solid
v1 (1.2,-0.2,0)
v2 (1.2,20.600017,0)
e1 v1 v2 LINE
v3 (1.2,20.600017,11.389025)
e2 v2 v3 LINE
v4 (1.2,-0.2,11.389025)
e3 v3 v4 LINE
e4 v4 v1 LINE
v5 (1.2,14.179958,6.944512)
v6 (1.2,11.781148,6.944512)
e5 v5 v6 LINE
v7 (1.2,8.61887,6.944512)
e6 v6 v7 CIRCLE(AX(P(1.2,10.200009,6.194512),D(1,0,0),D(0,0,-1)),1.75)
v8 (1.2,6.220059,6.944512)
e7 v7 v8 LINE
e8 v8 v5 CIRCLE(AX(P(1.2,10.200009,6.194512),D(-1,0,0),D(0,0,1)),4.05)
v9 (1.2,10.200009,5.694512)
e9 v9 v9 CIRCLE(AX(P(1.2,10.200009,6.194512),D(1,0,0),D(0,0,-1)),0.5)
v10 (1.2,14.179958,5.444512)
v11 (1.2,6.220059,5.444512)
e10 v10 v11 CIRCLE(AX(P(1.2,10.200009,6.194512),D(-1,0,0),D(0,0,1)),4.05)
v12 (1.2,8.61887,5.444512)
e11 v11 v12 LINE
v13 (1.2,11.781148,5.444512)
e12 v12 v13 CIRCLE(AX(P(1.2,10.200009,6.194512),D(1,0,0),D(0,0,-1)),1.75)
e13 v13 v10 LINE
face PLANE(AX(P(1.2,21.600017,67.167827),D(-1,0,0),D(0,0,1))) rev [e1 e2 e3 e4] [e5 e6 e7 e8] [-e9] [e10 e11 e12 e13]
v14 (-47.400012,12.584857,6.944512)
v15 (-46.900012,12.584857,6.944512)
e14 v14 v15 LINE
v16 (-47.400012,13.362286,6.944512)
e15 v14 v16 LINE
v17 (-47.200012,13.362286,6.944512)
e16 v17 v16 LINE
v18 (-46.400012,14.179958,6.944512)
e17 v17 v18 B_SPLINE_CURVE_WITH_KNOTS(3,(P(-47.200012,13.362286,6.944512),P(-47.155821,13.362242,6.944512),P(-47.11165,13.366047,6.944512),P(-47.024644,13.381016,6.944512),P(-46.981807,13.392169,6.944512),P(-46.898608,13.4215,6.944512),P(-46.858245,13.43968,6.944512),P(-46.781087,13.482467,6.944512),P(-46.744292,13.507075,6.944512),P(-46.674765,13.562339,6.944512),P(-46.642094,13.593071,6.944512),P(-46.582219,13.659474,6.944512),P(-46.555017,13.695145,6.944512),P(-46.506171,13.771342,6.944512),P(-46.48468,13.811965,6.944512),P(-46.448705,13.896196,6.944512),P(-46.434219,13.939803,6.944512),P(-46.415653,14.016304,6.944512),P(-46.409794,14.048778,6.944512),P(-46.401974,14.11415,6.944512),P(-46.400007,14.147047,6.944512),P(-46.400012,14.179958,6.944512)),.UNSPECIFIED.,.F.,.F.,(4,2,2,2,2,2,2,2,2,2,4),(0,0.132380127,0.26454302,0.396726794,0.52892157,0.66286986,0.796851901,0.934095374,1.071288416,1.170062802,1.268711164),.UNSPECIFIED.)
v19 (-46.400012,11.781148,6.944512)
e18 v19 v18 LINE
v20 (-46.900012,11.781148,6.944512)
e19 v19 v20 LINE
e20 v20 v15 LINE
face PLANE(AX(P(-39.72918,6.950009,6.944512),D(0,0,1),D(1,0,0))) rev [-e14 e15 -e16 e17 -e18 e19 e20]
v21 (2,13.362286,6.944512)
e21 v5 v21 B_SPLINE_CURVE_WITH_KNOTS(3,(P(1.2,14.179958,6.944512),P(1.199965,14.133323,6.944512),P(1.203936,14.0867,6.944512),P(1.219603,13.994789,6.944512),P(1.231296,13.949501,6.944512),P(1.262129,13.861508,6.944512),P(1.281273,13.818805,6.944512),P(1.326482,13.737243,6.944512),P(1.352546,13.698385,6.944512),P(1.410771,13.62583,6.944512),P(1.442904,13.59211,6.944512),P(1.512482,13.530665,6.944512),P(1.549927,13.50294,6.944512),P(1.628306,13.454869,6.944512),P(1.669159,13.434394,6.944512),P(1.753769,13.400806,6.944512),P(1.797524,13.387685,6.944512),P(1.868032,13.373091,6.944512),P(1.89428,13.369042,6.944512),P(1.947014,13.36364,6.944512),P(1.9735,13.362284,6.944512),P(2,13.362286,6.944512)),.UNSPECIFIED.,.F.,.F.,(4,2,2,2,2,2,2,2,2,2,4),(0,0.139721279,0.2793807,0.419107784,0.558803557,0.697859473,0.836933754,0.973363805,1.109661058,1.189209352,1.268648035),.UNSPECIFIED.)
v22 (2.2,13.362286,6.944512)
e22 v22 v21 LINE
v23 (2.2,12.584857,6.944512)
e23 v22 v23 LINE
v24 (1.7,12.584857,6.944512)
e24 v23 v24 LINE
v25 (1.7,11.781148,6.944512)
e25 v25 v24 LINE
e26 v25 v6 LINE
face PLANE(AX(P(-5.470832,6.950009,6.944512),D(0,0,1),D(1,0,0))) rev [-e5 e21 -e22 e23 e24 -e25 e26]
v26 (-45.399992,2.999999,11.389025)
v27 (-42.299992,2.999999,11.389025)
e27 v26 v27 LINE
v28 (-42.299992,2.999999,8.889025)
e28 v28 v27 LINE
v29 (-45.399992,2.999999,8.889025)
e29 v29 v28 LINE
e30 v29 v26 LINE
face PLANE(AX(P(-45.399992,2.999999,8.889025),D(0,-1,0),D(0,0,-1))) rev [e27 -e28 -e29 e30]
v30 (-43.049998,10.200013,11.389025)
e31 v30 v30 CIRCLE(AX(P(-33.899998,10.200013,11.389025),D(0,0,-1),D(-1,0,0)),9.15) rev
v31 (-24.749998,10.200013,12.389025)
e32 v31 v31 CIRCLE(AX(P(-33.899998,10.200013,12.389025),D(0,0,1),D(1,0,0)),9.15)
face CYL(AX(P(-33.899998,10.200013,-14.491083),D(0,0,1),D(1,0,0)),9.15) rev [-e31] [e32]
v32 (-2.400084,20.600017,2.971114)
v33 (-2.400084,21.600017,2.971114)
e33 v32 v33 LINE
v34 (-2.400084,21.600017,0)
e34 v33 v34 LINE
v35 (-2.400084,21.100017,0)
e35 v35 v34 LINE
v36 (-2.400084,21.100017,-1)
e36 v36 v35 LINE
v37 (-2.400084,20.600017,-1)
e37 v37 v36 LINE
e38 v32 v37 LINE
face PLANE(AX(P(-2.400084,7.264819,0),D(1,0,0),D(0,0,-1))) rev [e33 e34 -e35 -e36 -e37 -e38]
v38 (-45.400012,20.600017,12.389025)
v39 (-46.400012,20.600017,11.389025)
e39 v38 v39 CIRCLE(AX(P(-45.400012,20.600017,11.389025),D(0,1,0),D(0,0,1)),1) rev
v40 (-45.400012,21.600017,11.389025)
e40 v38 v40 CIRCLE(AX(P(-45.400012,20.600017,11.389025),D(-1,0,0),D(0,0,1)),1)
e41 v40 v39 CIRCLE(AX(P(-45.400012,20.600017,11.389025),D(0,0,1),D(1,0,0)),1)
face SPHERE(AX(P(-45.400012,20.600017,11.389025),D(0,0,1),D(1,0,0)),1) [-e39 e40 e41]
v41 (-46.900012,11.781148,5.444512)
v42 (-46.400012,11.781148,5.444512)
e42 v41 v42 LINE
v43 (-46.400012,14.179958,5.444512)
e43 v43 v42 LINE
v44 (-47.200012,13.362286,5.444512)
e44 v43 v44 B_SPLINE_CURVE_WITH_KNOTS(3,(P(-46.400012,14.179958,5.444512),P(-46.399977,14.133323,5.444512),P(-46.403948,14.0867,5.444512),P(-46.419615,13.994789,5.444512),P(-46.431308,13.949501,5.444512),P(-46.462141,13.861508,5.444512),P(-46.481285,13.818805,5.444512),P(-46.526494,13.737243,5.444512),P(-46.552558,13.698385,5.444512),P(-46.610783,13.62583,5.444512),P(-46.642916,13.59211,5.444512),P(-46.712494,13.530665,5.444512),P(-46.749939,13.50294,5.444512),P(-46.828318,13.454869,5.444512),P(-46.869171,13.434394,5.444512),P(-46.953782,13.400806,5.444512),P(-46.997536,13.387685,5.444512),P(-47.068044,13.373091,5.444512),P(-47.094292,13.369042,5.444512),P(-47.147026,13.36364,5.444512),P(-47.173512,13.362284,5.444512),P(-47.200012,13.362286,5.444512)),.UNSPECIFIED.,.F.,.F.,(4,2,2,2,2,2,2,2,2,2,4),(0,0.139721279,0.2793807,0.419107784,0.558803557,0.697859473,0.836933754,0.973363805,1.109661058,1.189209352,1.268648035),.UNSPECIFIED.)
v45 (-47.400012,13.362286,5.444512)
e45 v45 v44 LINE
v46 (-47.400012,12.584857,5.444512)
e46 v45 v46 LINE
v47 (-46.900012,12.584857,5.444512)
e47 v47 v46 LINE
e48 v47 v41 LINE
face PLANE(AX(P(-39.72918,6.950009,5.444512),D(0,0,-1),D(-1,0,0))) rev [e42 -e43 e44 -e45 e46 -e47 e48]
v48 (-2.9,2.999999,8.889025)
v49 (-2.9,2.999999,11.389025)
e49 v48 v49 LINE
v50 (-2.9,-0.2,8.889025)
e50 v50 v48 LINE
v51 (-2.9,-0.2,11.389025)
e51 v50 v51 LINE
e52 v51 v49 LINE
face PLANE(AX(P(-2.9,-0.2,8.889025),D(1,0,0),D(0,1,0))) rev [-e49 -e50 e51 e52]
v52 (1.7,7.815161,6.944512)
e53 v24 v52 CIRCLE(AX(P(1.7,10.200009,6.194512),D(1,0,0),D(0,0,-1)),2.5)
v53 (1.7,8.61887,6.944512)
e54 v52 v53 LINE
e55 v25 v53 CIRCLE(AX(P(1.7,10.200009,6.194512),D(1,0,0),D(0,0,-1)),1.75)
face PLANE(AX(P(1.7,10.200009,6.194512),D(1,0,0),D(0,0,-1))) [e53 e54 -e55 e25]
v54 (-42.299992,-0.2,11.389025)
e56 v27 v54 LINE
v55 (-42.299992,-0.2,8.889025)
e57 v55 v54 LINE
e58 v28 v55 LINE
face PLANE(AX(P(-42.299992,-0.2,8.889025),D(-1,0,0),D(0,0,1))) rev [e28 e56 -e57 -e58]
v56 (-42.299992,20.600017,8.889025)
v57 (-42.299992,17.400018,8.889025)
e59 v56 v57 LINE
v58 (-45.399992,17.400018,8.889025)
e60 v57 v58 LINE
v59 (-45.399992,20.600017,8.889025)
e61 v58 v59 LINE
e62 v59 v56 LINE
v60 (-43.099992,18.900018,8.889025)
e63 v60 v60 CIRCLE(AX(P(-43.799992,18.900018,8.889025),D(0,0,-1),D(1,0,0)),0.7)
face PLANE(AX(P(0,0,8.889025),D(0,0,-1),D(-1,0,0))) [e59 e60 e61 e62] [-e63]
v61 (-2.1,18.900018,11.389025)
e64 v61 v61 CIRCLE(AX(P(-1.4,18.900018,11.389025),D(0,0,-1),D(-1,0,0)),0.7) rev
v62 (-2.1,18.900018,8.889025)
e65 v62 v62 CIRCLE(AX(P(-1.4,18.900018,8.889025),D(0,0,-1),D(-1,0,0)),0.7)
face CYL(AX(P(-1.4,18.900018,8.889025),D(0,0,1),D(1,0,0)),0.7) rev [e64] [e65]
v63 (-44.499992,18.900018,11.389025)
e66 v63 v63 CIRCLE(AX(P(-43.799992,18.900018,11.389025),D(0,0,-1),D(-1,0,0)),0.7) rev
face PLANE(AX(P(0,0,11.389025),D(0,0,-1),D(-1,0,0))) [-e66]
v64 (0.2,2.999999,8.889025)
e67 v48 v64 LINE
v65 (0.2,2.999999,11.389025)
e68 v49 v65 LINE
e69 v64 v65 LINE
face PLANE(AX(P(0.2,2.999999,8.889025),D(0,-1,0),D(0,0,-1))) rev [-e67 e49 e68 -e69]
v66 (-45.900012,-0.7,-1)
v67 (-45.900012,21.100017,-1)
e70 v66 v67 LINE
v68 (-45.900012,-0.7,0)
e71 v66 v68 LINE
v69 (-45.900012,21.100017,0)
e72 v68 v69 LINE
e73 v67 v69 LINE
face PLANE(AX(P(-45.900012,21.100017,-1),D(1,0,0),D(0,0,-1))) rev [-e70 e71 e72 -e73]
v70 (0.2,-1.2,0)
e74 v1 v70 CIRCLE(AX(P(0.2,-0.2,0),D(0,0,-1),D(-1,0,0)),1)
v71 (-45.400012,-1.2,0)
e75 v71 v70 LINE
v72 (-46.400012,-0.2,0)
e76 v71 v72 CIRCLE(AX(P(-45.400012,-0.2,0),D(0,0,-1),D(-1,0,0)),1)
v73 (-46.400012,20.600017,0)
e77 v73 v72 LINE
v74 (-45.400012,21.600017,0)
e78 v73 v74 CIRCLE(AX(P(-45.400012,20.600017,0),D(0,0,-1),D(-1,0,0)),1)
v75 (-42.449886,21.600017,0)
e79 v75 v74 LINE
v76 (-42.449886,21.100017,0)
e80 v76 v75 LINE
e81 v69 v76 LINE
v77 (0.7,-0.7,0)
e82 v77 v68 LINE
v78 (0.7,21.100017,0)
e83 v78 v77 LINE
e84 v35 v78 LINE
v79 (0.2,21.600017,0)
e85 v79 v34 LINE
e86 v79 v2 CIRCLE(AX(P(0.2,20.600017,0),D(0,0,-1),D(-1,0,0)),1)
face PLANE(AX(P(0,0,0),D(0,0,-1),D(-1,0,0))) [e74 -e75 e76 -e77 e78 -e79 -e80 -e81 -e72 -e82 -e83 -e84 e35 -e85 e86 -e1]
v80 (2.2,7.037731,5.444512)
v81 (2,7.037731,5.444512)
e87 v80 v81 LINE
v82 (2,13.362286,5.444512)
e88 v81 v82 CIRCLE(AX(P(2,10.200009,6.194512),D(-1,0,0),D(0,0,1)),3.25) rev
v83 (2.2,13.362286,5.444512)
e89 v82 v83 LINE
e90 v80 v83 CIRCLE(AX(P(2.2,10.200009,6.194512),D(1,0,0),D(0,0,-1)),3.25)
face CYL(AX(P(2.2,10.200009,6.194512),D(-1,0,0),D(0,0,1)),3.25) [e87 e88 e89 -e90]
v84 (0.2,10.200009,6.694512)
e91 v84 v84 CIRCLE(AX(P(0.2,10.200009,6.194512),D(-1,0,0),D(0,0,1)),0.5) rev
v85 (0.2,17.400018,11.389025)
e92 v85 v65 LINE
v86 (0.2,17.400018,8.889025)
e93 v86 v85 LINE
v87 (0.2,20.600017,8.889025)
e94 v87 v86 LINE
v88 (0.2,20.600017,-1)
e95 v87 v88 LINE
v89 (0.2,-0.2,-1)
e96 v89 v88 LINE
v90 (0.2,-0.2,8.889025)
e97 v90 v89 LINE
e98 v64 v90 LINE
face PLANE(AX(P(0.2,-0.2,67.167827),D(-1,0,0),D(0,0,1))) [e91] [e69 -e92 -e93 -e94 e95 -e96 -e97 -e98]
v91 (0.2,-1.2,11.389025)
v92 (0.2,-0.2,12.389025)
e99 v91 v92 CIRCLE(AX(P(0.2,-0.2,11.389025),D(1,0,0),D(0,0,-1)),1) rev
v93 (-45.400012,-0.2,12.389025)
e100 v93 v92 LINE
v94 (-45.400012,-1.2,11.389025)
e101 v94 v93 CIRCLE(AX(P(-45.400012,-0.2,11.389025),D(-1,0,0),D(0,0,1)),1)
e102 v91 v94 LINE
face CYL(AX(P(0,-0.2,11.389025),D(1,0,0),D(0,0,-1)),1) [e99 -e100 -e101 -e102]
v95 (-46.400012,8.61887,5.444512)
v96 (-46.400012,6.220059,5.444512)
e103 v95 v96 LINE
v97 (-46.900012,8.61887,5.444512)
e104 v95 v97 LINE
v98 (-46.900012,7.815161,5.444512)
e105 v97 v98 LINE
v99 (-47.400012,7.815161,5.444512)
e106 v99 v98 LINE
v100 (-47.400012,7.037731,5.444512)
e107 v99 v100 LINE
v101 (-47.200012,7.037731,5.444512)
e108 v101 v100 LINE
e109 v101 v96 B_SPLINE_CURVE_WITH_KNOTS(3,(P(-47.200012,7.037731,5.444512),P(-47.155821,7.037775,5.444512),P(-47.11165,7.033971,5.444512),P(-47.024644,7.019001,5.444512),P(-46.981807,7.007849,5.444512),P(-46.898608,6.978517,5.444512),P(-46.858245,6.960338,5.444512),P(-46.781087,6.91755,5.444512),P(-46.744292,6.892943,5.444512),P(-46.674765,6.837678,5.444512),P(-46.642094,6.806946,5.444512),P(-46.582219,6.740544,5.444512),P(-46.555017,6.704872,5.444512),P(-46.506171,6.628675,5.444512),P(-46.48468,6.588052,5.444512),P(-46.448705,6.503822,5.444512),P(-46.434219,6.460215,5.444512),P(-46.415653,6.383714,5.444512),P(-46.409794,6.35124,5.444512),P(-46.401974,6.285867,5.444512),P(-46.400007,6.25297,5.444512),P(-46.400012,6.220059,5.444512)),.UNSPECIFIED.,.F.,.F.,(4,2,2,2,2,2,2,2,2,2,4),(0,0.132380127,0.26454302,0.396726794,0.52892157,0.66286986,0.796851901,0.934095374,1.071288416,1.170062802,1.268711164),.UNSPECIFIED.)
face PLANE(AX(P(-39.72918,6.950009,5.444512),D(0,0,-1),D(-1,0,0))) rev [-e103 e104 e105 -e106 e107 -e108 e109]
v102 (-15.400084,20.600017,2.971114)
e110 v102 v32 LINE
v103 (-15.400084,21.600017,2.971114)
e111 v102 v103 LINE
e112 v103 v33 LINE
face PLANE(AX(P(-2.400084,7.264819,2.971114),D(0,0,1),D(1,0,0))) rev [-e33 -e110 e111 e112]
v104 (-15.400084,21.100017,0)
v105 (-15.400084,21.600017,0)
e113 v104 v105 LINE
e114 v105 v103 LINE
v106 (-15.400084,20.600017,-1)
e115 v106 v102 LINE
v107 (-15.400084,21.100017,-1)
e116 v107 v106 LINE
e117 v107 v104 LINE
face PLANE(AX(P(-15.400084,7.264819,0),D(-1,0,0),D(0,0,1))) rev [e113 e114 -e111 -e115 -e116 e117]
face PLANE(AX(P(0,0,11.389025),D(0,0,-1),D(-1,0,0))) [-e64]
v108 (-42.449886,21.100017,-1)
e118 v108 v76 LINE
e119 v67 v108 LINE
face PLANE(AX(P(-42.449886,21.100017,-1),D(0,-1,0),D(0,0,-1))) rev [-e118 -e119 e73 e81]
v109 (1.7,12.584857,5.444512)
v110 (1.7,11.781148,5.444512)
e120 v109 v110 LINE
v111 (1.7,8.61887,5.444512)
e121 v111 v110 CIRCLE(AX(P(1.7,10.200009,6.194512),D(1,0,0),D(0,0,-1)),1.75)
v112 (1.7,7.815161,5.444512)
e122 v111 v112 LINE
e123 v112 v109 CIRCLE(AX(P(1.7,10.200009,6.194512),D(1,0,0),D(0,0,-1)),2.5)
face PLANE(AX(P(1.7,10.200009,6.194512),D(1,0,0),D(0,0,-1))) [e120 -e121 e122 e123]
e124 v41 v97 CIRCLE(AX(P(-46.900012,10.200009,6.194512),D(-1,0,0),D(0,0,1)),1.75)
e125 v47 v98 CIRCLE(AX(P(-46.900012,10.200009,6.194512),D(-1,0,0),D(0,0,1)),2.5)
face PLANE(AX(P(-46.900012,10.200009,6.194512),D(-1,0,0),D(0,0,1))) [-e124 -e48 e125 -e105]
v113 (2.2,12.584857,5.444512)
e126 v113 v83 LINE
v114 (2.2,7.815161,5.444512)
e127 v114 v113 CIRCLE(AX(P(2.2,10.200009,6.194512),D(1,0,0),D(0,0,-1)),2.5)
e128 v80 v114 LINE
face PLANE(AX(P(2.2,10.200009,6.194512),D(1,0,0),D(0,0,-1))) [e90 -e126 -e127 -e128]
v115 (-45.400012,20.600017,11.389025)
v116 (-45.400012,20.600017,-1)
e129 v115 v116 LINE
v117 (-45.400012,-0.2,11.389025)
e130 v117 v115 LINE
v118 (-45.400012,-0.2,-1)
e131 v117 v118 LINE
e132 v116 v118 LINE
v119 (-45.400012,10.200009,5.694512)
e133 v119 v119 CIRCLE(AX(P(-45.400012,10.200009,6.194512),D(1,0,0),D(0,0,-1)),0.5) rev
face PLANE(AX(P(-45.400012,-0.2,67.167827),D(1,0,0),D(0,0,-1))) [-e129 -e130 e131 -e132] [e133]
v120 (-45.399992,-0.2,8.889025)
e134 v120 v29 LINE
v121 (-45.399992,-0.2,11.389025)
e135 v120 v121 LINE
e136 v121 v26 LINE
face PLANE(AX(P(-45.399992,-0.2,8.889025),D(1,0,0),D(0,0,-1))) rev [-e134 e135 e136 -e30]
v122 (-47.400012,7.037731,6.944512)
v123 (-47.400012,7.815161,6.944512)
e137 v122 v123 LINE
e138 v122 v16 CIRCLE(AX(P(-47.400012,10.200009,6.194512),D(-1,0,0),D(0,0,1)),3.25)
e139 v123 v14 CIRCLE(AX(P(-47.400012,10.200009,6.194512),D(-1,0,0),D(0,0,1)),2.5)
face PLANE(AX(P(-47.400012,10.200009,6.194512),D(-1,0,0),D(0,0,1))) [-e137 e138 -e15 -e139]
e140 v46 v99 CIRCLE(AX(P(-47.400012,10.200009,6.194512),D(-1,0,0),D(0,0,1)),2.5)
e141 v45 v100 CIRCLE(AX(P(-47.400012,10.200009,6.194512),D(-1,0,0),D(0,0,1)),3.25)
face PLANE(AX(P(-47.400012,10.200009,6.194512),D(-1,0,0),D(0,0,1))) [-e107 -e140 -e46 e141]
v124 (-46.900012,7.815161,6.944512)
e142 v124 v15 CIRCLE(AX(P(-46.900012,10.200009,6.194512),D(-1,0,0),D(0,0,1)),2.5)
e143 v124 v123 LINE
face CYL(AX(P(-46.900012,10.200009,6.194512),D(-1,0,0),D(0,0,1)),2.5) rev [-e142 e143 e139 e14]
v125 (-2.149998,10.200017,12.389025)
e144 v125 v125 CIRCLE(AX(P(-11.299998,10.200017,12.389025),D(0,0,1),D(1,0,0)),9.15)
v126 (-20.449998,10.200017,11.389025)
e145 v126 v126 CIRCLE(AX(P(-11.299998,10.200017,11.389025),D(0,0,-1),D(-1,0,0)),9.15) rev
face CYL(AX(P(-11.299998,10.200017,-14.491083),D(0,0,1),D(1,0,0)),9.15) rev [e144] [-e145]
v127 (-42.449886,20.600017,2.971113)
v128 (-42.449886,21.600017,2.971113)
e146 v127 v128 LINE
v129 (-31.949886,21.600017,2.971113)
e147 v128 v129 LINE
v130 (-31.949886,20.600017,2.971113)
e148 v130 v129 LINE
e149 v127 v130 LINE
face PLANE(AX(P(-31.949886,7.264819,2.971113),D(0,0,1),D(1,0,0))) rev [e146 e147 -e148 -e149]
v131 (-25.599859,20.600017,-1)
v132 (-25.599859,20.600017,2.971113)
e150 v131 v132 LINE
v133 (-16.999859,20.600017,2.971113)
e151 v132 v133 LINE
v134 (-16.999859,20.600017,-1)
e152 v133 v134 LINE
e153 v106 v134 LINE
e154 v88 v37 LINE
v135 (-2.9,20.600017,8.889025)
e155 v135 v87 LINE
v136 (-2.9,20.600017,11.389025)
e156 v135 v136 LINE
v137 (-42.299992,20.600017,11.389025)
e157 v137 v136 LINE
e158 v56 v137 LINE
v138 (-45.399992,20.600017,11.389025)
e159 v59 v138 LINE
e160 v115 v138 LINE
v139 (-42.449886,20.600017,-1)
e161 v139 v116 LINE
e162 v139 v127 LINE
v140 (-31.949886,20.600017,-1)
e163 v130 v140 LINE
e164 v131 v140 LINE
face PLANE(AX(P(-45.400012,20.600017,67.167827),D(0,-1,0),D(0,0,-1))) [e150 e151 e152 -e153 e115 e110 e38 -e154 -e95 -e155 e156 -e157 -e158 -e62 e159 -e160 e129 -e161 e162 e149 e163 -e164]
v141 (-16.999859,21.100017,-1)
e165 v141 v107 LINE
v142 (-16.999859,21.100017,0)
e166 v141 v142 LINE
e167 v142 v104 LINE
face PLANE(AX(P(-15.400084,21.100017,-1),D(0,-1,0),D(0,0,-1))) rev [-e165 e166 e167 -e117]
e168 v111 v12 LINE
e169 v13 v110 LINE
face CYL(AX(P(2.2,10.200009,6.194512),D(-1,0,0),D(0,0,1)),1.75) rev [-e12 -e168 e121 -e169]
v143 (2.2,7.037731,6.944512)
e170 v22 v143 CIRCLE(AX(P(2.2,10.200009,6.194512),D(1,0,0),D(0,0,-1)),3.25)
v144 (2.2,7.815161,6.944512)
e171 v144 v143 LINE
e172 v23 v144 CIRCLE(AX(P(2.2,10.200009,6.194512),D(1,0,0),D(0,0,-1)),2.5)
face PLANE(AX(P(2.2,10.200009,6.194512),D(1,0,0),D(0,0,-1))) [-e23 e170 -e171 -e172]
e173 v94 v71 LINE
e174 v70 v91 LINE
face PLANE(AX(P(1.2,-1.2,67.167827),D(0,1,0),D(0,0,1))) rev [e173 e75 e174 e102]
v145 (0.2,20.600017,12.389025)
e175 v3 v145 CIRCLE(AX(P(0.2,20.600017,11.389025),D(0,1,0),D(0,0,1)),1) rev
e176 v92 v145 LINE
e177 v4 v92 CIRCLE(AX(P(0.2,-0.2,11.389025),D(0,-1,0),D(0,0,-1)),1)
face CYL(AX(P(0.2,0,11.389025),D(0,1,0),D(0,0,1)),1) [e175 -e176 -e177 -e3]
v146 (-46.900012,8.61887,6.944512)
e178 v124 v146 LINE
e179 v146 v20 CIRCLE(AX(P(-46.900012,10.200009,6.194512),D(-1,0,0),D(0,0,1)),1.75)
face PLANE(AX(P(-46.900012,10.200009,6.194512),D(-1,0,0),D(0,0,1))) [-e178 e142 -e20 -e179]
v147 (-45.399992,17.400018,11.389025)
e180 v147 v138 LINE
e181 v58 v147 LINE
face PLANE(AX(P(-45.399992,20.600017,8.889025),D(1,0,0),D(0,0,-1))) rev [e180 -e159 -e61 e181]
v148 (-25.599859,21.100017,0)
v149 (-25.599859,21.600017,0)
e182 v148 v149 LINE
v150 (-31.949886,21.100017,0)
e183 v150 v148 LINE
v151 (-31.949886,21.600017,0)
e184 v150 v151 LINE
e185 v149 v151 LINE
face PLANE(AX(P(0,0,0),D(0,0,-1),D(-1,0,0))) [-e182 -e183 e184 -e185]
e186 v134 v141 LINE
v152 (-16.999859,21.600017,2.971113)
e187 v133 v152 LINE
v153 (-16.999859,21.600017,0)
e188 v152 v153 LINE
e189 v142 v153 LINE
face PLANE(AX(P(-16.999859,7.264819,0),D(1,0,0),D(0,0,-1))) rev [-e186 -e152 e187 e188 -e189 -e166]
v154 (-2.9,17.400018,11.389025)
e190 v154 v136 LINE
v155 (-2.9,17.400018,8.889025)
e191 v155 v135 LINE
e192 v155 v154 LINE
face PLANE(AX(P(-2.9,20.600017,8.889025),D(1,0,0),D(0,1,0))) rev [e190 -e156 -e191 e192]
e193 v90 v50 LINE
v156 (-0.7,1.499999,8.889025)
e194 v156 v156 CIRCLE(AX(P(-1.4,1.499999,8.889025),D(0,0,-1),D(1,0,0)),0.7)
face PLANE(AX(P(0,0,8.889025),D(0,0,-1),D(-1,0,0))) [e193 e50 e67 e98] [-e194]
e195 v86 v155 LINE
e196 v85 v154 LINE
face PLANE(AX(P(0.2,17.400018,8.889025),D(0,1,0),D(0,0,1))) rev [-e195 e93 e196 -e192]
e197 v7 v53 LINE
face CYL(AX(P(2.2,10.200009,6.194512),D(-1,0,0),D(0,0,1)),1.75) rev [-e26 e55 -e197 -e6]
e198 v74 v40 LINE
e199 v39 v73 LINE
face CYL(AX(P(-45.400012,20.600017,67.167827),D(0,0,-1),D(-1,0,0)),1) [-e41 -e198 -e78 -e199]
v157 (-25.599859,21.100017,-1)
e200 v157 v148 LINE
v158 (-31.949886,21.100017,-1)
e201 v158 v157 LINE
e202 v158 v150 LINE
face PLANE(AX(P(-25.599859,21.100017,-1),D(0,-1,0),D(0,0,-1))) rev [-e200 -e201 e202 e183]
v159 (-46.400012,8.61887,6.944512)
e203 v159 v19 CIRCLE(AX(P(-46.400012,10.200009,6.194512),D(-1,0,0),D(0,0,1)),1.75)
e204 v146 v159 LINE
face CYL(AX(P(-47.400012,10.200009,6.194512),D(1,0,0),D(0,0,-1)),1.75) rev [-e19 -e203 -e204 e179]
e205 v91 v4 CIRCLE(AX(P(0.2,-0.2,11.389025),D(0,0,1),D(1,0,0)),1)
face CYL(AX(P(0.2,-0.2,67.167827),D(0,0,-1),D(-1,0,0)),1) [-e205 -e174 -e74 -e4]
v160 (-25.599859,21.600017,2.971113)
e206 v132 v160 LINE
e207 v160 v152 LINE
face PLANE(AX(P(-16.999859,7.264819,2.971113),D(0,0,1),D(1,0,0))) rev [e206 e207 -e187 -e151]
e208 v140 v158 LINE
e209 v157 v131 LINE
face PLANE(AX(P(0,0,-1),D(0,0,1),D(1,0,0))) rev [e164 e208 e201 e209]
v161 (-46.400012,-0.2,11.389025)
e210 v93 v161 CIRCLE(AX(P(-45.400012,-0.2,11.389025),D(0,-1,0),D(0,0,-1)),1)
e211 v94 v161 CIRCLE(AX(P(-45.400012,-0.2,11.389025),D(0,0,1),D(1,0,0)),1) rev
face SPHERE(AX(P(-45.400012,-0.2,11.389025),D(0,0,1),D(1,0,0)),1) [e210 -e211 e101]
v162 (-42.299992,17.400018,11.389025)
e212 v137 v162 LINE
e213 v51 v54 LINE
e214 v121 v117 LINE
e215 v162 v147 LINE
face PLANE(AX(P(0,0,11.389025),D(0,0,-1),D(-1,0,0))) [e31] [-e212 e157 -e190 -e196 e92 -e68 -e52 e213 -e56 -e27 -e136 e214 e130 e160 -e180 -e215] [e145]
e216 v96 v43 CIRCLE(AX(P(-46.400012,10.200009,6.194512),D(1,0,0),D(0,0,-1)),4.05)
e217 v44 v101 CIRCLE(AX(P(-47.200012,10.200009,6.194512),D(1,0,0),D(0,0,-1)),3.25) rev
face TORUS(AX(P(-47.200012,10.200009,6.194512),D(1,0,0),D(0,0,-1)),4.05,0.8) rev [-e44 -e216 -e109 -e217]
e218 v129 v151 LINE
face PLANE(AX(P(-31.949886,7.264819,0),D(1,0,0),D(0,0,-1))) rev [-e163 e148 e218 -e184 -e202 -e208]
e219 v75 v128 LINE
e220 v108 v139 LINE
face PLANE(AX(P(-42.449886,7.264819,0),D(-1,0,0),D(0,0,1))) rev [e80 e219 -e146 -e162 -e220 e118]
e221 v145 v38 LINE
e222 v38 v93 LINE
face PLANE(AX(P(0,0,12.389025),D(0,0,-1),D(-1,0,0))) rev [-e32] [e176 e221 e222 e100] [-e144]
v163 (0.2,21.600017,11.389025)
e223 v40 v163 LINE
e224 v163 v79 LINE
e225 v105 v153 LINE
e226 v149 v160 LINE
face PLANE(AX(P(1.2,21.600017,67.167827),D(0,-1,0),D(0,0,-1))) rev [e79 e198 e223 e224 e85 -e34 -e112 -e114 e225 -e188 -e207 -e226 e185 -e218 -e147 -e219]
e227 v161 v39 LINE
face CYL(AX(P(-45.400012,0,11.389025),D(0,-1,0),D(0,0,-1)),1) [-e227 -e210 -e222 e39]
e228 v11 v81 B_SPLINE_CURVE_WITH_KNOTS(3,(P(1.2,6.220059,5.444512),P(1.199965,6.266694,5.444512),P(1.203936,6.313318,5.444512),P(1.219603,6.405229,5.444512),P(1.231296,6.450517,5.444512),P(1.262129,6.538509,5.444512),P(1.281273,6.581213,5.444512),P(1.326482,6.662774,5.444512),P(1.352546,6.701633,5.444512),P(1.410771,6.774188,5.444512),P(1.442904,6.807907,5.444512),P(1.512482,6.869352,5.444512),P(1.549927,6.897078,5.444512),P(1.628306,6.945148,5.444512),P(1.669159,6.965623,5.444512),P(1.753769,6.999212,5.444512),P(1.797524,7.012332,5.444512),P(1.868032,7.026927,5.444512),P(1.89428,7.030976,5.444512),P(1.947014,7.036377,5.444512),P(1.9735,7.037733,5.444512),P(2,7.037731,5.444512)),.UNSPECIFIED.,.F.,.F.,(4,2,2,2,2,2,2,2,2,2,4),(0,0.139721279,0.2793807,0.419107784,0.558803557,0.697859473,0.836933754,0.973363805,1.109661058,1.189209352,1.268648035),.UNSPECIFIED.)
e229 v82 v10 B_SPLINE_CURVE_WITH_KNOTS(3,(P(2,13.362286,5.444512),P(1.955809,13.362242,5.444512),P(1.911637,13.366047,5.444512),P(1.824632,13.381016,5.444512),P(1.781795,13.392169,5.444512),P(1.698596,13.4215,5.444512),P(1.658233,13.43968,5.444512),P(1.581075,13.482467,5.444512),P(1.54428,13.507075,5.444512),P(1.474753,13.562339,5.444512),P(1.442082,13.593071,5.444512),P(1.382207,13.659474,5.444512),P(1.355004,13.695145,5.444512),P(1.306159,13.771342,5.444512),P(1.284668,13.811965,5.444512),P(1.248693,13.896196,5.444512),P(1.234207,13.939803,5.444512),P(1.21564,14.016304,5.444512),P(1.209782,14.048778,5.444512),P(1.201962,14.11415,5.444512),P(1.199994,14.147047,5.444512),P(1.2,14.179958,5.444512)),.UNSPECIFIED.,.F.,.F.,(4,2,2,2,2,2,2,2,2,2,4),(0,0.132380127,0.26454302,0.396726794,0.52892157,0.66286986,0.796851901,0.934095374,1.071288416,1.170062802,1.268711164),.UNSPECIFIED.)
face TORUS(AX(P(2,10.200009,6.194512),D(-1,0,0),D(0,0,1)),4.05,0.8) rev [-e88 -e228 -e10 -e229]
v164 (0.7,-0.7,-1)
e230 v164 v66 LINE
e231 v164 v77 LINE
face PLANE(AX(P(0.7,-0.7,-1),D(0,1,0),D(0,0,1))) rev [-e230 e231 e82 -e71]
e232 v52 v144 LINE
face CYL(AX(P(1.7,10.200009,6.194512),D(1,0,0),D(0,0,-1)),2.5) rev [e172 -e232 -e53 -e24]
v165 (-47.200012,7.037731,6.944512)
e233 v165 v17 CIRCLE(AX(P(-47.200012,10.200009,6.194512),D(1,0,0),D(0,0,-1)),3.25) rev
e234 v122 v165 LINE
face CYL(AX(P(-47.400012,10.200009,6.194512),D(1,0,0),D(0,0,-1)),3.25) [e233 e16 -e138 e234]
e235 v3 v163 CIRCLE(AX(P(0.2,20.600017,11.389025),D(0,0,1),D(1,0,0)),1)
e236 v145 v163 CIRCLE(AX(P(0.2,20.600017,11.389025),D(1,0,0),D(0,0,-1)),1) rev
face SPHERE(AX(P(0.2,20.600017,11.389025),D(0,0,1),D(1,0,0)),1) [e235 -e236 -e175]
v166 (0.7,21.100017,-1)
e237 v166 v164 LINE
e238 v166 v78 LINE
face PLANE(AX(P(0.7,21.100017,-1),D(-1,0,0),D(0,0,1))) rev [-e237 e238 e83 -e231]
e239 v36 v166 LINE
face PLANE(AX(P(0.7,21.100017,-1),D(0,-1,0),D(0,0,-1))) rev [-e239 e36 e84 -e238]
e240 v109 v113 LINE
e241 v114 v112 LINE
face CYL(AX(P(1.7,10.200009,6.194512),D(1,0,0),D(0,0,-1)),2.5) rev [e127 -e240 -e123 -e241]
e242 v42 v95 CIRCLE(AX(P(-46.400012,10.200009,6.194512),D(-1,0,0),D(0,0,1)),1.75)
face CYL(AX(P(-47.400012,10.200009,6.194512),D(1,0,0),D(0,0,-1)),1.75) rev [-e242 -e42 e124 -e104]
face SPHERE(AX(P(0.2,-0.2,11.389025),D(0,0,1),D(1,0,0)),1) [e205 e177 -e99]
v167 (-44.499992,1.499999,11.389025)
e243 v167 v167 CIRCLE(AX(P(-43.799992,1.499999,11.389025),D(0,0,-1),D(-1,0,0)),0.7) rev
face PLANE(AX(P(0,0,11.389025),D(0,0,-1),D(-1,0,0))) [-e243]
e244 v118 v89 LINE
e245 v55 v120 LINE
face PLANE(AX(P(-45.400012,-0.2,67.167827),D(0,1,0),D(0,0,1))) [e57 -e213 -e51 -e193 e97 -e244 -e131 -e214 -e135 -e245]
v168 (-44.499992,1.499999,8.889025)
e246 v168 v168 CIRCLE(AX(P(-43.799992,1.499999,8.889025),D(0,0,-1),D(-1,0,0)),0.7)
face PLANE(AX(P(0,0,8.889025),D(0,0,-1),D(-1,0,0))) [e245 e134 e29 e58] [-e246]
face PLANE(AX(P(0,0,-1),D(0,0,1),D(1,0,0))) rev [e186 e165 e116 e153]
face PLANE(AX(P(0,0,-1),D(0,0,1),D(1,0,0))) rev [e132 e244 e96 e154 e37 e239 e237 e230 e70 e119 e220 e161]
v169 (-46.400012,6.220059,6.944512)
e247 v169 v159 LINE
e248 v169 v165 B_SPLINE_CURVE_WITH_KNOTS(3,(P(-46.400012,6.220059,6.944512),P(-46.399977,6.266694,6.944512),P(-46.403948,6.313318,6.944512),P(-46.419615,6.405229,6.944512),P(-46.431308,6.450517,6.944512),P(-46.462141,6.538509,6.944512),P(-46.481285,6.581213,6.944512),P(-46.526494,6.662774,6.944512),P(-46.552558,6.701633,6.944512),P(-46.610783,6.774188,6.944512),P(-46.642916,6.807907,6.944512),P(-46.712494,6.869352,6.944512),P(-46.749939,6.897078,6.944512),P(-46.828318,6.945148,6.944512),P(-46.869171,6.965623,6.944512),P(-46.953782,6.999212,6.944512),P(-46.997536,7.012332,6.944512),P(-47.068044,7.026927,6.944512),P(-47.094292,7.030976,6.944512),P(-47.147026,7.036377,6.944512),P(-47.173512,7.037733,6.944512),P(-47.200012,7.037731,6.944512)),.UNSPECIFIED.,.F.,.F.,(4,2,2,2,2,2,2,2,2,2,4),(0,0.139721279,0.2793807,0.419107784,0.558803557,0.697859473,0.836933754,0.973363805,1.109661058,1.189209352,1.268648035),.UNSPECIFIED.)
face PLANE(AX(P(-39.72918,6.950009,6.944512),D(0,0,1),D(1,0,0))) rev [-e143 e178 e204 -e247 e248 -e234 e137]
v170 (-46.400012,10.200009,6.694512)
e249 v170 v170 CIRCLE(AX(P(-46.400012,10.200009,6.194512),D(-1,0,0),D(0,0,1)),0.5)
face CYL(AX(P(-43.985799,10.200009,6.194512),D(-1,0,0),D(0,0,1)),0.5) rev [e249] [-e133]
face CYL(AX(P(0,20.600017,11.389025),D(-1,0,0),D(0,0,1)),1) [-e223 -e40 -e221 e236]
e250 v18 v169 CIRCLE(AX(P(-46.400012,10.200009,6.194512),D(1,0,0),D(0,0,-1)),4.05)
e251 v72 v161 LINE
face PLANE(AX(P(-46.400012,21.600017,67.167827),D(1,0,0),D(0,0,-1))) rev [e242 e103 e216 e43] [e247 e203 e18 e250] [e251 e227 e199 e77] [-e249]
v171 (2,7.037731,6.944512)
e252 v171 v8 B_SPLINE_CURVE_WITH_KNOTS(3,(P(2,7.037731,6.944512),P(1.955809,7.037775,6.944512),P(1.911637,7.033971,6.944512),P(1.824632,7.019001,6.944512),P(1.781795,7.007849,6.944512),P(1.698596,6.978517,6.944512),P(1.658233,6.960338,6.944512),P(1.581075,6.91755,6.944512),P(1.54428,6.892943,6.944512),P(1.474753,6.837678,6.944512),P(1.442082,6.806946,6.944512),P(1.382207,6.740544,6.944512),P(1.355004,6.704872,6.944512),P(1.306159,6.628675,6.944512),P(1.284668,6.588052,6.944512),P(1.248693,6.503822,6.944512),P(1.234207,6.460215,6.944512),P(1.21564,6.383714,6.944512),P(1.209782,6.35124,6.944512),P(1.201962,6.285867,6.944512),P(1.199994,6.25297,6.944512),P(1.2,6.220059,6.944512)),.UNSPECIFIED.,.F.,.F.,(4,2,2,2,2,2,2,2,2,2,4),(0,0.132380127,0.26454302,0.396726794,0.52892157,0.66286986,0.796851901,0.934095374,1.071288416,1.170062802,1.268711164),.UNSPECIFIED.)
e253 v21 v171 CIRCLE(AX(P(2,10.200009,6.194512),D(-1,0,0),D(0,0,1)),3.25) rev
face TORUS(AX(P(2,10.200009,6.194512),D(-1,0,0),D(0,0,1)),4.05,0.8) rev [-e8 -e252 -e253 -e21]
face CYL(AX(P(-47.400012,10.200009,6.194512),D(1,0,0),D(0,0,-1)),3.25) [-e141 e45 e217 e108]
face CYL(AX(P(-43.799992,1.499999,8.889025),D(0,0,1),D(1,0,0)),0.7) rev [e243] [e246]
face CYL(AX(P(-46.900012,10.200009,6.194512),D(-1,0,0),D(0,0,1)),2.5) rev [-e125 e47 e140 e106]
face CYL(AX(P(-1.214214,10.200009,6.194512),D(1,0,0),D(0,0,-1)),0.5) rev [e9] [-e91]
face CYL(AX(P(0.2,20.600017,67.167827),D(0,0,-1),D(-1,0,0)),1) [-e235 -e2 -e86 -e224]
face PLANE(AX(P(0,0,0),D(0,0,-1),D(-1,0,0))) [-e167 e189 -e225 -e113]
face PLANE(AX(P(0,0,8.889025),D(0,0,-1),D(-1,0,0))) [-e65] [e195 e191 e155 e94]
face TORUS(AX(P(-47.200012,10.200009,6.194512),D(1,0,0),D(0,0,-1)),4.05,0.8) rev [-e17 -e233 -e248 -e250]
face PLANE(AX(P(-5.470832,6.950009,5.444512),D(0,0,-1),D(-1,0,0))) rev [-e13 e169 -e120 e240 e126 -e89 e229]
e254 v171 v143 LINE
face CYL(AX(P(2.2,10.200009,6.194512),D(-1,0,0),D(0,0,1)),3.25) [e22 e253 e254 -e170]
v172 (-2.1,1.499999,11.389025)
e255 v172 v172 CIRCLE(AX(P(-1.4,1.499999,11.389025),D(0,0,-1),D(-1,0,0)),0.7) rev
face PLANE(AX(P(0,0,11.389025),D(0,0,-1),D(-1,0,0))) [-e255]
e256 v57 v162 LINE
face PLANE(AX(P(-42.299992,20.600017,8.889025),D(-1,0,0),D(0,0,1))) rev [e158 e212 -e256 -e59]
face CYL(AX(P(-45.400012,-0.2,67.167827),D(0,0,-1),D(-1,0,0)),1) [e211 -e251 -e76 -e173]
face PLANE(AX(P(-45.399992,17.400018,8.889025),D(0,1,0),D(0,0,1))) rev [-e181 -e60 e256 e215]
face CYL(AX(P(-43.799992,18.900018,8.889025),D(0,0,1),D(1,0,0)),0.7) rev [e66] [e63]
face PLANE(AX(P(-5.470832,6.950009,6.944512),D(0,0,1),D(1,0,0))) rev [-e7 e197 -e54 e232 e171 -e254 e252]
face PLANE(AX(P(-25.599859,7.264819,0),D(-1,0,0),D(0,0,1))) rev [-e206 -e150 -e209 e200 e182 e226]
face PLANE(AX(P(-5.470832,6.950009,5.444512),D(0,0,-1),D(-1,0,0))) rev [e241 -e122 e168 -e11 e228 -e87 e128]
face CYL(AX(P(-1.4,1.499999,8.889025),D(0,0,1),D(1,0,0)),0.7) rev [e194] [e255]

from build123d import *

# Parameters (mm, degrees)
SKETCH_1_W           = 47.600012207
SKETCH_1_H           = 22.800017408
SKETCH_1_W_2         = 45.600012207
SKETCH_1_H_2         = 20.800017408
EXTRUDE_1_DEPTH      = 11.389024732
SKETCH_2_W           = 47.600012207
SKETCH_2_H           = 22.800017408
EXTRUDE_2_DEPTH      = 1
SKETCH_3_R           = 9.15
CUT_EXTRUDE_1_DEPTH  = 1
SKETCH_7_W           = 13
SKETCH_7_H           = 2.971113622
SKETCH_7_W_2         = 8.6
SKETCH_7_H_2         = 2.971113154
SKETCH_7_W_3         = 10.5
SKETCH_7_H_3         = 2.971112957
CUT_EXTRUDE_2_DEPTH  = 1
SKETCH_8_R           = 3.25
SKETCH_8_R_2         = 1.75
EXTRUDE_3_DEPTH      = 1
SKETCH_9_W           = 1.5
SKETCH_9_H           = 6.5
CUT_EXTRUDE_3_DEPTH  = 1
SKETCH_10_R          = 2.5
CUT_EXTRUDE_6_DEPTH  = 0.5
SKETCH_13_R          = 0.5
CUT_EXTRUDE_7_DEPTH  = 1
EXTRUDE_START        = 1
SKETCH_15_R          = 3.25
SKETCH_15_R_2        = 1.75
EXTRUDE_4_DEPTH      = 1
CUT_EXTRUDE_START    = -0.5
SKETCH_16_R          = 2.5
CUT_EXTRUDE_8_DEPTH  = 0.5
SKETCH_17_W          = 1.5
SKETCH_17_H          = 6.5
CUT_EXTRUDE_9_DEPTH  = 1
CUT_EXTRUDE_START_2  = -1
SKETCH_18_R          = 0.5
CUT_EXTRUDE_10_DEPTH = 1
SKETCH_19_W          = 1.599774972
SKETCH_19_H          = 0.5
SKETCH_19_W_2        = 6.350027001
EXTRUDE_5_DEPTH      = 1
FILLET_1_R           = 0.8
FILLET_2_R           = 1
SKETCH_20_W          = 3.099999541
SKETCH_20_H          = 3.199999216
SKETCH_20_R          = 0.7
EXTRUDE_6_DEPTH      = 2.5


with BuildPart() as part:
    # Эскиз1 → Бобышка-Вытянуть1 (new body)
    with BuildSketch(Plane.XY):
        with Locations((-22.600006104, 10.200008704)):
            Rectangle(SKETCH_1_W, SKETCH_1_H)
        with Locations((-22.600006104, 10.200008704)):
            Rectangle(SKETCH_1_W_2, SKETCH_1_H_2, mode=Mode.SUBTRACT)
    extrude(amount=EXTRUDE_1_DEPTH)

    # Эскиз2 → Бобышка-Вытянуть2 (add)
    with BuildSketch(Plane.XY.offset(11.389024732)):
        with Locations((-22.600006104, 10.200008704)):
            Rectangle(SKETCH_2_W, SKETCH_2_H)
    extrude(amount=EXTRUDE_2_DEPTH)

    # Эскиз3 → Вырез-Вытянуть1 (cut)
    with BuildSketch(Plane.XY.offset(12.389024732)):
        with Locations((-11.299998193, 10.200016658)):
            Circle(SKETCH_3_R)
        with Locations((-33.899998193, 10.200013156)):
            Circle(SKETCH_3_R)
    extrude(amount=-CUT_EXTRUDE_1_DEPTH, mode=Mode.SUBTRACT)

    # Эскиз7 → Вырез-Вытянуть2 (cut)
    with BuildSketch(Plane(origin=(0, 21.600017408, 0), x_dir=(1, 0, 0), z_dir=(0, 1, 0))):
        with Locations((-8.900084477, -1.485556811)):
            Rectangle(SKETCH_7_W, SKETCH_7_H)
        with Locations((-21.299859449, -1.485556577)):
            Rectangle(SKETCH_7_W_2, SKETCH_7_H_2)
        with Locations((-37.19988645, -1.485556479)):
            Rectangle(SKETCH_7_W_3, SKETCH_7_H_3)
    extrude(amount=-CUT_EXTRUDE_2_DEPTH, mode=Mode.SUBTRACT)

    # Эскиз8 → Бобышка-Вытянуть3 (add)
    with BuildSketch(Plane(origin=(1.2, 0, 0), x_dir=(0, 0, -1), z_dir=(1, 0, 0))):
        with Locations((-6.194512366, 10.200008704)):
            Circle(SKETCH_8_R)
        with Locations((-6.194512366, 10.200008704)):
            Circle(SKETCH_8_R_2, mode=Mode.SUBTRACT)
    extrude(amount=EXTRUDE_3_DEPTH)

    # Эскиз9 → Вырез-Вытянуть3 (cut)
    with BuildSketch(Plane(origin=(2.2, 0, 0), x_dir=(0, 0, -1), z_dir=(1, 0, 0))):
        with Locations((-6.194512366, 10.200008704)):
            Rectangle(SKETCH_9_W, SKETCH_9_H)
    extrude(amount=-CUT_EXTRUDE_3_DEPTH, mode=Mode.SUBTRACT)

    # Эскиз10 → Вырез-Вытянуть6 (cut)
    with BuildSketch(Plane(origin=(2.2, 0, 0), x_dir=(0, 0, -1), z_dir=(1, 0, 0))):
        with Locations((-6.194512366, 10.200008704)):
            Circle(SKETCH_10_R)
    extrude(amount=-CUT_EXTRUDE_6_DEPTH, mode=Mode.SUBTRACT)

    # Эскиз13 → Вырез-Вытянуть7 (cut)
    with BuildSketch(Plane(origin=(1.2, 0, 0), x_dir=(0, 0, -1), z_dir=(1, 0, 0))):
        with Locations((-6.194512366, 10.200008704)):
            Circle(SKETCH_13_R)
    extrude(amount=-CUT_EXTRUDE_7_DEPTH, mode=Mode.SUBTRACT)

    # Эскиз15 → Бобышка-Вытянуть4 (add)
    with BuildSketch(Plane.ZY.offset(46.400012207).offset(EXTRUDE_START)):
        with Locations((6.194512366, 10.200008704)):
            Circle(SKETCH_15_R)
        with Locations((6.194512366, 10.200008704)):
            Circle(SKETCH_15_R_2, mode=Mode.SUBTRACT)
    extrude(amount=-EXTRUDE_4_DEPTH)

    # Эскиз16 → Вырез-Вытянуть8 (cut)
    with BuildSketch(Plane.ZY.offset(47.400012207).offset(CUT_EXTRUDE_START)):
        with Locations((6.194512366, 10.200008704)):
            Circle(SKETCH_16_R)
    extrude(amount=CUT_EXTRUDE_8_DEPTH, mode=Mode.SUBTRACT)

    # Эскиз17 → Вырез-Вытянуть9 (cut)
    with BuildSketch(Plane.ZY.offset(47.400012207)):
        with Locations((6.194512366, 10.200008704)):
            Rectangle(SKETCH_17_W, SKETCH_17_H)
    extrude(amount=-CUT_EXTRUDE_9_DEPTH, mode=Mode.SUBTRACT)

    # Эскиз18 → Вырез-Вытянуть10 (cut)
    with BuildSketch(Plane.ZY.offset(46.400012207).offset(CUT_EXTRUDE_START_2)):
        with Locations(Location((6.194512366, 10.200008704, 0), (0, 0, 180))):
            Circle(SKETCH_18_R)
    extrude(amount=CUT_EXTRUDE_10_DEPTH, mode=Mode.SUBTRACT)

    # Эскиз19 → Бобышка-Вытянуть5 (add)
    with BuildSketch(Plane(origin=(0, 0, 0), x_dir=(-1, 0, 0), z_dir=(0, 0, -1))):
        with Locations((16.199971963, 20.850017408)):
            Rectangle(SKETCH_19_W, SKETCH_19_H)
        Polygon((45.400012207, -0.2), (-0.2, -0.2), (-0.2, 20.600017408), (2.400084477, 20.600017408), (2.400084477, 21.100017408), (-0.7, 21.100017408), (-0.7, -0.7), (45.900012207, -0.7), (45.900012207, 21.100017408), (42.44988645, 21.100017408), (42.44988645, 20.600017408), (45.400012207, 20.600017408), align=None)
        with Locations((28.77487295, 20.850017408)):
            Rectangle(SKETCH_19_W_2, SKETCH_19_H)
    extrude(amount=EXTRUDE_5_DEPTH)

    # Скругление1
    # the kernel refuses this fillet: 0.8 mm, written as the material it adds along each edge
    with BuildSketch(Plane(origin=(1.2, 10.200008704, 6.194512366), x_dir=(0, 0.9274601532021158, -0.3739220028592966), z_dir=(0, -0.3739220028592966, -0.9274601532021158))) as fillet_1_piece_1_section:
        with BuildLine():
            CenterArc((3.25 + FILLET_1_R, FILLET_1_R), FILLET_1_R, 180, 90)
            Line((3.25, FILLET_1_R), (3.25, 0))
            Line((3.25, 0), (3.25 + FILLET_1_R, 0))
        make_face()
    fillet_1_piece_1 = revolve(axis=Axis((1.2, 10.200008704, 6.194512366), (1, 0, 0)), revolution_arc=223.915403392, mode=Mode.PRIVATE)
    fillet_1_piece_1 = split(fillet_1_piece_1, bisect_by=Plane(origin=(1.369516768, 13.485333566, 5.444512366), z_dir=(0, 0, -1)), keep=Keep.TOP, mode=Mode.PRIVATE)
    add(fillet_1_piece_1)
    with BuildSketch(Plane(origin=(1.2, 10.200008704, 6.194512366), x_dir=(0, 0.9274601532021158, -0.3739220028592966), z_dir=(0, -0.3739220028592966, -0.9274601532021158))) as fillet_1_piece_2_section:
        with BuildLine():
            CenterArc((3.25 + FILLET_1_R, FILLET_1_R), FILLET_1_R, 180, 90)
            Line((3.25, FILLET_1_R), (3.25, 0))
            Line((3.25, 0), (3.25 + FILLET_1_R, 0))
        make_face()
    fillet_1_piece_2 = revolve(axis=Axis((1.2, 10.200008704, 6.194512366), (1, 0, 0)), revolution_arc=223.915403392, mode=Mode.PRIVATE)
    fillet_1_piece_2 = split(fillet_1_piece_2, bisect_by=Plane(origin=(1.426653651, 10.200008704, 6.944512366), z_dir=(0, 0, 1)), keep=Keep.TOP, mode=Mode.PRIVATE)
    add(fillet_1_piece_2)
    with BuildSketch(Plane(origin=(1.2, 10.200008704, 6.194512366), x_dir=(0, 0.9274601532021, 0.37392200285933624), z_dir=(0, -0.37392200285933624, 0.9274601532021))) as fillet_1_piece_3_section:
        with BuildLine():
            CenterArc((3.25 + FILLET_1_R, -FILLET_1_R), FILLET_1_R, 90, 90)
            Line((3.25, -FILLET_1_R), (3.25, 0))
            Line((3.25, 0), (3.25 + FILLET_1_R, 0))
        make_face()
    fillet_1_piece_3 = revolve(axis=Axis((1.2, 10.200008704, 6.194512366), (-1, 0, 0)), revolution_arc=223.915403392, mode=Mode.PRIVATE)
    fillet_1_piece_3 = split(fillet_1_piece_3, bisect_by=Plane(origin=(1.369517053, 13.485333689, 6.944512366), z_dir=(0, 0, 1)), keep=Keep.TOP, mode=Mode.PRIVATE)
    add(fillet_1_piece_3)
    with BuildSketch(Plane(origin=(1.2, 10.200008704, 6.194512366), x_dir=(0, 0.9274601532021, 0.37392200285933624), z_dir=(0, -0.37392200285933624, 0.9274601532021))) as fillet_1_piece_4_section:
        with BuildLine():
            CenterArc((3.25 + FILLET_1_R, -FILLET_1_R), FILLET_1_R, 90, 90)
            Line((3.25, -FILLET_1_R), (3.25, 0))
            Line((3.25, 0), (3.25 + FILLET_1_R, 0))
        make_face()
    fillet_1_piece_4 = revolve(axis=Axis((1.2, 10.200008704, 6.194512366), (-1, 0, 0)), revolution_arc=223.915403392, mode=Mode.PRIVATE)
    fillet_1_piece_4 = split(fillet_1_piece_4, bisect_by=Plane(origin=(1.426653651, 10.200008704, 5.444512366), z_dir=(0, 0, -1)), keep=Keep.TOP, mode=Mode.PRIVATE)
    add(fillet_1_piece_4)
    with BuildSketch(Plane(origin=(-46.400012207, 10.200008704, 6.194512366), x_dir=(0, 0.9274601532021159, 0.3739220028592964), z_dir=(0, -0.3739220028592964, 0.9274601532021159))) as fillet_1_piece_5_section:
        with BuildLine():
            CenterArc((3.25 + FILLET_1_R, FILLET_1_R), FILLET_1_R, 180, 90)
            Line((3.25, FILLET_1_R), (3.25, 0))
            Line((3.25, 0), (3.25 + FILLET_1_R, 0))
        make_face()
    fillet_1_piece_5 = revolve(axis=Axis((-46.400012207, 10.200008704, 6.194512366), (-1, 0, 0)), revolution_arc=223.915403392, mode=Mode.PRIVATE)
    fillet_1_piece_5 = split(fillet_1_piece_5, bisect_by=Plane(origin=(-46.56952926, 13.485333689, 6.944512366), z_dir=(0, 0, 1)), keep=Keep.TOP, mode=Mode.PRIVATE)
    add(fillet_1_piece_5)
    with BuildSketch(Plane(origin=(-46.400012207, 10.200008704, 6.194512366), x_dir=(0, 0.9274601532021159, 0.3739220028592964), z_dir=(0, -0.3739220028592964, 0.9274601532021159))) as fillet_1_piece_6_section:
        with BuildLine():
            CenterArc((3.25 + FILLET_1_R, FILLET_1_R), FILLET_1_R, 180, 90)
            Line((3.25, FILLET_1_R), (3.25, 0))
            Line((3.25, 0), (3.25 + FILLET_1_R, 0))
        make_face()
    fillet_1_piece_6 = revolve(axis=Axis((-46.400012207, 10.200008704, 6.194512366), (-1, 0, 0)), revolution_arc=223.915403392, mode=Mode.PRIVATE)
    fillet_1_piece_6 = split(fillet_1_piece_6, bisect_by=Plane(origin=(-46.626665858, 10.200008704, 5.444512366), z_dir=(0, 0, -1)), keep=Keep.TOP, mode=Mode.PRIVATE)
    add(fillet_1_piece_6)
    with BuildSketch(Plane(origin=(-46.400012207, 10.200008704, 6.194512366), x_dir=(0, 0.9274601532020997, -0.3739220028593366), z_dir=(0, -0.3739220028593366, -0.9274601532020997))) as fillet_1_piece_7_section:
        with BuildLine():
            CenterArc((3.25 + FILLET_1_R, -FILLET_1_R), FILLET_1_R, 90, 90)
            Line((3.25, -FILLET_1_R), (3.25, 0))
            Line((3.25, 0), (3.25 + FILLET_1_R, 0))
        make_face()
    fillet_1_piece_7 = revolve(axis=Axis((-46.400012207, 10.200008704, 6.194512366), (1, 0, 0)), revolution_arc=223.915403392, mode=Mode.PRIVATE)
    fillet_1_piece_7 = split(fillet_1_piece_7, bisect_by=Plane(origin=(-46.569528975, 13.485333566, 5.444512366), z_dir=(0, 0, -1)), keep=Keep.TOP, mode=Mode.PRIVATE)
    add(fillet_1_piece_7)
    with BuildSketch(Plane(origin=(-46.400012207, 10.200008704, 6.194512366), x_dir=(0, 0.9274601532020997, -0.3739220028593366), z_dir=(0, -0.3739220028593366, -0.9274601532020997))) as fillet_1_piece_8_section:
        with BuildLine():
            CenterArc((3.25 + FILLET_1_R, -FILLET_1_R), FILLET_1_R, 90, 90)
            Line((3.25, -FILLET_1_R), (3.25, 0))
            Line((3.25, 0), (3.25 + FILLET_1_R, 0))
        make_face()
    fillet_1_piece_8 = revolve(axis=Axis((-46.400012207, 10.200008704, 6.194512366), (1, 0, 0)), revolution_arc=223.915403392, mode=Mode.PRIVATE)
    fillet_1_piece_8 = split(fillet_1_piece_8, bisect_by=Plane(origin=(-46.626665858, 10.200008704, 6.944512366), z_dir=(0, 0, 1)), keep=Keep.TOP, mode=Mode.PRIVATE)
    add(fillet_1_piece_8)

    # Скругление2
    fillet_2_edges = [part.edges().sort_by_distance(p)[0] for p in [
        (1.2, -1.2, 6.194512366),
        (1.2, 10.200008704, 12.389024732),
        (-22.600006104, 21.600017408, 12.389024732),
        (-46.400012207, 10.200008704, 12.389024732),
        (-22.600006104, -1.2, 12.389024732),
        (1.2, 21.600017408, 6.194512366),
        (-46.400012207, 21.600017408, 6.194512366),
        (-46.400012207, -1.2, 6.194512366),
    ]]
    fillet(fillet_2_edges, radius=FILLET_2_R)

    # Эскиз20 → Бобышка-Вытянуть6 (add)
    # profile 1 of 4: a face of its own
    with BuildSketch(Plane(origin=(0, 0, 11.389024732), x_dir=(-1, 0, 0), z_dir=(0, 0, -1))):
        with Locations((1.34999977, 19.0000178)):
            Rectangle(SKETCH_20_W, SKETCH_20_H)
        with Locations((1.399999541, 18.900018192)):
            Circle(SKETCH_20_R, mode=Mode.SUBTRACT)
    # profile 2 of 4: a face of its own
    with BuildSketch(Plane(origin=(0, 0, 11.389024732), x_dir=(-1, 0, 0), z_dir=(0, 0, -1))):
        with Locations((1.34999977, 1.399999608)):
            Rectangle(SKETCH_20_W, SKETCH_20_H)
        with Locations(Location((1.399999541, 1.499999216, 0), (0, 0, 180))):
            Circle(SKETCH_20_R, mode=Mode.SUBTRACT)
    # profile 3 of 4: a face of its own
    with BuildSketch(Plane(origin=(0, 0, 11.389024732), x_dir=(-1, 0, 0), z_dir=(0, 0, -1))):
        with Locations((43.849992032, 1.399999608)):
            Rectangle(SKETCH_20_W, SKETCH_20_H)
        with Locations((43.799992261, 1.499999216)):
            Circle(SKETCH_20_R, mode=Mode.SUBTRACT)
    # profile 4 of 4: a face of its own
    with BuildSketch(Plane(origin=(0, 0, 11.389024732), x_dir=(-1, 0, 0), z_dir=(0, 0, -1))):
        with Locations((43.849992032, 19.0000178)):
            Rectangle(SKETCH_20_W, SKETCH_20_H)
        with Locations(Location((43.799992261, 18.900018192, 0), (0, 0, 180))):
            Circle(SKETCH_20_R, mode=Mode.SUBTRACT)
    extrude(amount=EXTRUDE_6_DEPTH)


solid = part.part
